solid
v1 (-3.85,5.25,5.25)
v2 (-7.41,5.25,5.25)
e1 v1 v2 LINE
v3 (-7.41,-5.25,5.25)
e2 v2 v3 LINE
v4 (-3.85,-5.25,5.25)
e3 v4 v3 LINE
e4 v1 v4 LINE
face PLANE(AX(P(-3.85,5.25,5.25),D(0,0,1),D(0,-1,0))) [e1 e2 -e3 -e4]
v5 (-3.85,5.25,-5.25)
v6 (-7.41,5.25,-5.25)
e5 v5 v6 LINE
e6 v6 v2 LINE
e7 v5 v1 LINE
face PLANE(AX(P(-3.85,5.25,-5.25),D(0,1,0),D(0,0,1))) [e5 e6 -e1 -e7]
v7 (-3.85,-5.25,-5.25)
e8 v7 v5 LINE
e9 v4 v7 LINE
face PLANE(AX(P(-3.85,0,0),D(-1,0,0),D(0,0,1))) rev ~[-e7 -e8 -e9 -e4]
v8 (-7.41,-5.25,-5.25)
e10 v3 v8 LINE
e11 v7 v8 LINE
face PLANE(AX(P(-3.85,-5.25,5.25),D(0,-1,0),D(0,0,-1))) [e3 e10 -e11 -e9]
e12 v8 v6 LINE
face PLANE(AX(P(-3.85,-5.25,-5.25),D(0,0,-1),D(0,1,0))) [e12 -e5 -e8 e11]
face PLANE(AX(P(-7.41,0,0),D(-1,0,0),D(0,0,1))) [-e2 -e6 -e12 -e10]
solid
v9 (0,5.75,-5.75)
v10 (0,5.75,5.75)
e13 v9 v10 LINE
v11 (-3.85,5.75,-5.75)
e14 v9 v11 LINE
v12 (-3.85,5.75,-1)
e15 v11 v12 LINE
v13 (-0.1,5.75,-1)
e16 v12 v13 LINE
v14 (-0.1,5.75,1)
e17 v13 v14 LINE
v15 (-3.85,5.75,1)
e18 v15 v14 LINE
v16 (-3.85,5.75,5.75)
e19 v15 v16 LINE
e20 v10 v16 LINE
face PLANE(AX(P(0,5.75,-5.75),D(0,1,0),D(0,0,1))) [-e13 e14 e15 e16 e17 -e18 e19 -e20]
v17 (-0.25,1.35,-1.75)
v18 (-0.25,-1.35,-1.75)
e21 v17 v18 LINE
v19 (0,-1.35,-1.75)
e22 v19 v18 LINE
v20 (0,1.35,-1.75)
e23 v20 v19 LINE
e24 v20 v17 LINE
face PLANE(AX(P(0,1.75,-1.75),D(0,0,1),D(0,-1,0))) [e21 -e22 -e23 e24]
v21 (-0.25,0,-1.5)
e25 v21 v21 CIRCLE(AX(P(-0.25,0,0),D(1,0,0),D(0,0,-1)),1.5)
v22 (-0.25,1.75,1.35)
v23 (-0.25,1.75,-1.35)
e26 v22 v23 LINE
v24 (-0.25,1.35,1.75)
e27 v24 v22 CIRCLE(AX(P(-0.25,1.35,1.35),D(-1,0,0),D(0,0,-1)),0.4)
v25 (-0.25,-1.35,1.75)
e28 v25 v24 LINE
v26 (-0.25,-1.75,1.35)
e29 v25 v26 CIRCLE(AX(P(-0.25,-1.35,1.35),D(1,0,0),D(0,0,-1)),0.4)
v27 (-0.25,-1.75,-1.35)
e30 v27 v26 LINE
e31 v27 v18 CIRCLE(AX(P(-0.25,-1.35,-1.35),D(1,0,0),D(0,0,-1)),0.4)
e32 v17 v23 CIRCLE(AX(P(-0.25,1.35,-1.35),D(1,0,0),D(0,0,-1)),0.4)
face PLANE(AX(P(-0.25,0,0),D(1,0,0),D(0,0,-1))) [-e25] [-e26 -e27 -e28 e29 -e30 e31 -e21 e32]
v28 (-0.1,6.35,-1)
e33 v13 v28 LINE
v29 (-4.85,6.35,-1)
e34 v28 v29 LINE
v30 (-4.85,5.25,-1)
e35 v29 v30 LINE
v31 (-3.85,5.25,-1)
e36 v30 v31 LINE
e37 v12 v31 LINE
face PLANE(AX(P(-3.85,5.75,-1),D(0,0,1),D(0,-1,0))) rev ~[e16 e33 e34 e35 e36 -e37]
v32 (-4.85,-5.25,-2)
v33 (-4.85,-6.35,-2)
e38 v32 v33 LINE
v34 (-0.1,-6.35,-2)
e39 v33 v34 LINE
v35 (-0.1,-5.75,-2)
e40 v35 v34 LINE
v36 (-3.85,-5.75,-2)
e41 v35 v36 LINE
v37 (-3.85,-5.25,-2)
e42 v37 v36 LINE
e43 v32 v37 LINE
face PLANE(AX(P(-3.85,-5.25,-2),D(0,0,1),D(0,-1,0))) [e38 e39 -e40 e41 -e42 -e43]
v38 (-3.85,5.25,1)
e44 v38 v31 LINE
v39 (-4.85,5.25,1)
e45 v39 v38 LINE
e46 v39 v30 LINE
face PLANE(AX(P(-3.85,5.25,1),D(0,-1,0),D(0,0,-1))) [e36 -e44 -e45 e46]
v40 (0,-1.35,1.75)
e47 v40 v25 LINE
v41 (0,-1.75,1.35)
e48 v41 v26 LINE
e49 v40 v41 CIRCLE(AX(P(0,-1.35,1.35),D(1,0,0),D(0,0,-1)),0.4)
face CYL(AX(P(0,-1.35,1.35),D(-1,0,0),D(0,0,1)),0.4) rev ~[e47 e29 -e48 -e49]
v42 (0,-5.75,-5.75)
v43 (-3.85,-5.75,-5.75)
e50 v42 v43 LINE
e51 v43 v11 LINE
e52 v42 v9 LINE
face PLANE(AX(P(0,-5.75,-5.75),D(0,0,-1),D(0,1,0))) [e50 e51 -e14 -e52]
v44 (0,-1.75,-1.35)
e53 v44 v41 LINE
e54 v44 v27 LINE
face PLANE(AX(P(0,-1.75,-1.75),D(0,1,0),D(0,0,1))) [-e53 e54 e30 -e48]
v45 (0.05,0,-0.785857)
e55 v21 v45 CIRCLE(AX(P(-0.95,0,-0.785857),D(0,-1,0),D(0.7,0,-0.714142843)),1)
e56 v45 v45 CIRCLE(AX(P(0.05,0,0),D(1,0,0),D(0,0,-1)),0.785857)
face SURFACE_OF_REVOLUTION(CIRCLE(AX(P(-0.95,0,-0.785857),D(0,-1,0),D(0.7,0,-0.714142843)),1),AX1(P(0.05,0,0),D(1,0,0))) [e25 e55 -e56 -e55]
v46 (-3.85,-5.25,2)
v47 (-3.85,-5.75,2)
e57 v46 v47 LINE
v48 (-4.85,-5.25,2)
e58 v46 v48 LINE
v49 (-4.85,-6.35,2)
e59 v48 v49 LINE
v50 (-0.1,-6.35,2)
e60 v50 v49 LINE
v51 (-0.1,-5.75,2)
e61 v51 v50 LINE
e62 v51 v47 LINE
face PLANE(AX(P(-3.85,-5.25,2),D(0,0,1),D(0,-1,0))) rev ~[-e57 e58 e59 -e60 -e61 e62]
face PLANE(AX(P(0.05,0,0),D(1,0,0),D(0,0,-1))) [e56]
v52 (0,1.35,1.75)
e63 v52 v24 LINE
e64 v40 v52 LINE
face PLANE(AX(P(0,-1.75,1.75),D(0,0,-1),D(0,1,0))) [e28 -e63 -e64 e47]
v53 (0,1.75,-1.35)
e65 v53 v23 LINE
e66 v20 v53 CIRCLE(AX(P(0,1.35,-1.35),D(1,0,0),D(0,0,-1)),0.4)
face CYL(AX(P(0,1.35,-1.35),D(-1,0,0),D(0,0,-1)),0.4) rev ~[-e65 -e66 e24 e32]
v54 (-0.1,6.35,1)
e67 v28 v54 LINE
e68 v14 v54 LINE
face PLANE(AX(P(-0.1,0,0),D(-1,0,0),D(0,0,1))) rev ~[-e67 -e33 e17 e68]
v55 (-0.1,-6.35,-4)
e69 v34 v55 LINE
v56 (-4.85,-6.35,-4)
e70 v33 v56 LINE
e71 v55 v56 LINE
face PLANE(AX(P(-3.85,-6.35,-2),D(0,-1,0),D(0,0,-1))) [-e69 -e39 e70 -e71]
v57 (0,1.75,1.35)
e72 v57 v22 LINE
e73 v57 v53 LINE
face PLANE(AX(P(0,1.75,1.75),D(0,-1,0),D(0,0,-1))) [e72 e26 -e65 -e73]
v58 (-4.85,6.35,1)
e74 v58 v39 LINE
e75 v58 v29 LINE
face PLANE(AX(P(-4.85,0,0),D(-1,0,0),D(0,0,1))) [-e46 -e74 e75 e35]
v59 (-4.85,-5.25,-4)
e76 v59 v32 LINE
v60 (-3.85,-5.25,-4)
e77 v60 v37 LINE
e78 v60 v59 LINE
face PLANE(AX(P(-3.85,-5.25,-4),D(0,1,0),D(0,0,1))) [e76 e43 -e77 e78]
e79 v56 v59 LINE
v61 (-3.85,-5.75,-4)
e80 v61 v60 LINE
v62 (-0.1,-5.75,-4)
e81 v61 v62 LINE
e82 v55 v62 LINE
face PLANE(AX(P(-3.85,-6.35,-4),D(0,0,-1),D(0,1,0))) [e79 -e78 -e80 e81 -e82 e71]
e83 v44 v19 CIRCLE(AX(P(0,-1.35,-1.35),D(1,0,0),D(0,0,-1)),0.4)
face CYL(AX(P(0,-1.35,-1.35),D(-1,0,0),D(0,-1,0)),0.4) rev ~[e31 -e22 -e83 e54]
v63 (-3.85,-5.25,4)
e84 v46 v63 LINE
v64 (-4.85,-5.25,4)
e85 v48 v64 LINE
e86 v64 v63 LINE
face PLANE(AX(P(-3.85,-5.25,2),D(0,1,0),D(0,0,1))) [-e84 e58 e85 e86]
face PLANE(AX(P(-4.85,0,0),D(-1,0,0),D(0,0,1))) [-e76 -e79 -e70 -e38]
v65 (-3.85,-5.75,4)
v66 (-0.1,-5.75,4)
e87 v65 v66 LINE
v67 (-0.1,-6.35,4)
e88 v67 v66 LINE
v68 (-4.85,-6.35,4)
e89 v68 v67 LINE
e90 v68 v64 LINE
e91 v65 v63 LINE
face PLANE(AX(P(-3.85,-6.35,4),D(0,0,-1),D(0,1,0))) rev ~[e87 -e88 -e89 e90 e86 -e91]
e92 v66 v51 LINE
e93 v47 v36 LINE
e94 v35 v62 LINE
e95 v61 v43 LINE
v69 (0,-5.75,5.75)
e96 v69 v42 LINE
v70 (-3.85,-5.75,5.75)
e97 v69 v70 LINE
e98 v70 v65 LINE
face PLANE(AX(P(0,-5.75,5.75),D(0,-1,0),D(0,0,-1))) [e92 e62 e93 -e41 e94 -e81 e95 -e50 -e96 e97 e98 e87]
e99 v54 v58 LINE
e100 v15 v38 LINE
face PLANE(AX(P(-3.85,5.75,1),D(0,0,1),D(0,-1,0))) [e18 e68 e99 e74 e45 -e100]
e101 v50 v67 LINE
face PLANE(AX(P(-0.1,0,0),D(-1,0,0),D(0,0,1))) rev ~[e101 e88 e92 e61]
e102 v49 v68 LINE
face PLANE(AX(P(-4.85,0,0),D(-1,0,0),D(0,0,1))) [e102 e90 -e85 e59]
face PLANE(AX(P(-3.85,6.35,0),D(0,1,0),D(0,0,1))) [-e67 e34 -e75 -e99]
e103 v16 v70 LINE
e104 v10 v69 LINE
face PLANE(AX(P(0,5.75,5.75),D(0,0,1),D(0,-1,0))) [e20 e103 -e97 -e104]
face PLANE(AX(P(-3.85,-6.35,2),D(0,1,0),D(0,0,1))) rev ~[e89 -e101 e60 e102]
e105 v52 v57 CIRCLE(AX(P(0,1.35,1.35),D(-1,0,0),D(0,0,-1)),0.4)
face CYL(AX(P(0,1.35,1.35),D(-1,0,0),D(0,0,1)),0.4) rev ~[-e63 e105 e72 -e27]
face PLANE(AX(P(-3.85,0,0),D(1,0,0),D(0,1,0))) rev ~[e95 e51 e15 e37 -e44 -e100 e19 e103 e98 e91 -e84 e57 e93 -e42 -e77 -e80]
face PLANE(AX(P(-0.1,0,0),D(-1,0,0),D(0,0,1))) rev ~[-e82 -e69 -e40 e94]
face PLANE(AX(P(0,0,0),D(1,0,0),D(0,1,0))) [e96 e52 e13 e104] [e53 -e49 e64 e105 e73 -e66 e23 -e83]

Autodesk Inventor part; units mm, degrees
ref_plane "YZ Plane" through (0, 0, 0) normal (1, 0, 0) x (0, 1, 0)
ref_plane "XZ Plane" through (0, 0, 0) normal (0, 1, 0) x (-1, 0, 0)
ref_plane "XY Plane" through (0, 0, 0) normal (0, 0, 1) x (1, 0, 0)
sketch "Sketch1" plane through (0, 0, 0) normal (1, 0, 0) x (0, 1, 0)
  line L0 (5.75, 5.75) -> (-5.75, 5.75)
  line L1 (-5.75, 5.75) -> (-5.75, -5.75)
  line L2 (-5.75, -5.75) -> (5.75, -5.75)
  line L3 (5.75, -5.75) -> (5.75, 5.75)
  line L4 (5.75, 5.75) -> (-5.75, -5.75) construction
  line L5 (-5.75, 5.75) -> (5.75, -5.75) construction
  point P0 (0, 0)
  dimension "d0" = 11.5
  dimension "d1" = 11.5
extrude "Extrusion1" add sketch "Sketch1" against normal blind 3.85
sketch "Sketch2" plane through (-3.85, 0, 0) normal (-1, 0, 0) x (0, 0, 1)
  line L0 (-5.25, 5.25) -> (5.25, 5.25)
  line L1 (5.25, 5.25) -> (5.25, -5.25)
  line L2 (5.25, -5.25) -> (-5.25, -5.25)
  line L3 (-5.25, -5.25) -> (-5.25, 5.25)
  line L4 (-5.25, 5.25) -> (5.25, -5.25) construction
  line L5 (5.25, 5.25) -> (-5.25, -5.25) construction
  point P0 (0, 0)
  dimension "d4" = 10.5
  dimension "d5" = 10.5
extrude "Extrusion2" add sketch "Sketch2" along normal blind 3.56 separate body
sketch "Sketch3" plane through (-3.85, 0, 0) normal (-1, 0, 0) x (0, 0, 1)
  line L0 (5.75, 5.75) -> (-5.75, 5.75) projected
  line L1 (0, 5.75) -> (0, 5.25) construction
  line L2 (5.25, 5.25) -> (-5.25, 5.25) construction
  line L3 (0, 6.35) -> (-1, 6.35)
  line L4 (-1, 6.35) -> (-1, 5.25)
  line L5 (0, 6.35) -> (1, 6.35)
  line L6 (1, 6.35) -> (1, 5.25)
  line L7 (-1, 5.25) -> (1, 5.25) construction
  line L8 (-5.25, -5.25) -> (5.25, -5.25) projected
  line L9 (-4, -5.25) -> (-2, -5.25)
  line L10 (-2, -5.25) -> (-2, -6.35)
  line L11 (-2, -6.35) -> (-4, -6.35)
  line L12 (-4, -6.35) -> (-4, -5.25)
  line L13 (-5.25, 5.25) -> (-5.25, -5.25) projected
  line L14 (4, -5.25) -> (2, -5.25)
  line L15 (2, -5.25) -> (2, -6.35)
  line L16 (2, -6.35) -> (4, -6.35)
  line L17 (4, -6.35) -> (4, -5.25)
  line L18 (-1, 6.35) -> (1, 6.35)
  line L19 (1, 6.35) -> (1, 5.25)
  line L20 (1, 5.25) -> (-1, 5.25)
  line L21 (-1, 5.25) -> (-1, 6.35)
  point P0 (0, 0)
  dimension "d8" = 1
  dimension "d9" = 1.1
  dimension "d10" = 2
  dimension "d11" = 1.1
  dimension "d12" = 1.25
  dimension "d13" = 12.7
extrude "Extrusion3" add sketch "Sketch3" along normal blind 1 and the other way blind 3.75 bodies 1
sketch "Sketch4" plane through (0, 0, 0) normal (1, 0, 0) x (0, 0, -1)
  line L0 (-1.75, 1.75) -> (1.75, 1.75)
  line L1 (1.75, 1.75) -> (1.75, -1.75)
  line L2 (1.75, -1.75) -> (-1.75, -1.75)
  line L3 (-1.75, -1.75) -> (-1.75, 1.75)
  line L4 (-1.75, 1.75) -> (1.75, -1.75) construction
  line L5 (1.75, 1.75) -> (-1.75, -1.75) construction
  point P0 (0, 0)
  dimension "d18" = 3.5
  dimension "d19" = 3.5
extrude "Extrusion4" cut sketch "Sketch4" against normal blind 0.25 bodies 1
fillet "Fillet1" radius 0.4 4 edges at (-0.125, 1.75, 1.75) (-0.125, 1.75, -1.75) (-0.125, -1.75, 1.75) (-0.125, -1.75, -1.75)
sketch "Sketch5" plane through (-0.25, 0, 0) normal (1, 0, 0) x (0, 0, -1)
  circle A0 centre (0, 0) radius 1.5
  dimension "d23" = 3
extrude "Extrusion5" add sketch "Sketch5" along normal blind 0.3 bodies 1
fillet "Fillet2" radius 1 1 edges at (0.05, 0, 1.5)
properties part number "Thermal module"
